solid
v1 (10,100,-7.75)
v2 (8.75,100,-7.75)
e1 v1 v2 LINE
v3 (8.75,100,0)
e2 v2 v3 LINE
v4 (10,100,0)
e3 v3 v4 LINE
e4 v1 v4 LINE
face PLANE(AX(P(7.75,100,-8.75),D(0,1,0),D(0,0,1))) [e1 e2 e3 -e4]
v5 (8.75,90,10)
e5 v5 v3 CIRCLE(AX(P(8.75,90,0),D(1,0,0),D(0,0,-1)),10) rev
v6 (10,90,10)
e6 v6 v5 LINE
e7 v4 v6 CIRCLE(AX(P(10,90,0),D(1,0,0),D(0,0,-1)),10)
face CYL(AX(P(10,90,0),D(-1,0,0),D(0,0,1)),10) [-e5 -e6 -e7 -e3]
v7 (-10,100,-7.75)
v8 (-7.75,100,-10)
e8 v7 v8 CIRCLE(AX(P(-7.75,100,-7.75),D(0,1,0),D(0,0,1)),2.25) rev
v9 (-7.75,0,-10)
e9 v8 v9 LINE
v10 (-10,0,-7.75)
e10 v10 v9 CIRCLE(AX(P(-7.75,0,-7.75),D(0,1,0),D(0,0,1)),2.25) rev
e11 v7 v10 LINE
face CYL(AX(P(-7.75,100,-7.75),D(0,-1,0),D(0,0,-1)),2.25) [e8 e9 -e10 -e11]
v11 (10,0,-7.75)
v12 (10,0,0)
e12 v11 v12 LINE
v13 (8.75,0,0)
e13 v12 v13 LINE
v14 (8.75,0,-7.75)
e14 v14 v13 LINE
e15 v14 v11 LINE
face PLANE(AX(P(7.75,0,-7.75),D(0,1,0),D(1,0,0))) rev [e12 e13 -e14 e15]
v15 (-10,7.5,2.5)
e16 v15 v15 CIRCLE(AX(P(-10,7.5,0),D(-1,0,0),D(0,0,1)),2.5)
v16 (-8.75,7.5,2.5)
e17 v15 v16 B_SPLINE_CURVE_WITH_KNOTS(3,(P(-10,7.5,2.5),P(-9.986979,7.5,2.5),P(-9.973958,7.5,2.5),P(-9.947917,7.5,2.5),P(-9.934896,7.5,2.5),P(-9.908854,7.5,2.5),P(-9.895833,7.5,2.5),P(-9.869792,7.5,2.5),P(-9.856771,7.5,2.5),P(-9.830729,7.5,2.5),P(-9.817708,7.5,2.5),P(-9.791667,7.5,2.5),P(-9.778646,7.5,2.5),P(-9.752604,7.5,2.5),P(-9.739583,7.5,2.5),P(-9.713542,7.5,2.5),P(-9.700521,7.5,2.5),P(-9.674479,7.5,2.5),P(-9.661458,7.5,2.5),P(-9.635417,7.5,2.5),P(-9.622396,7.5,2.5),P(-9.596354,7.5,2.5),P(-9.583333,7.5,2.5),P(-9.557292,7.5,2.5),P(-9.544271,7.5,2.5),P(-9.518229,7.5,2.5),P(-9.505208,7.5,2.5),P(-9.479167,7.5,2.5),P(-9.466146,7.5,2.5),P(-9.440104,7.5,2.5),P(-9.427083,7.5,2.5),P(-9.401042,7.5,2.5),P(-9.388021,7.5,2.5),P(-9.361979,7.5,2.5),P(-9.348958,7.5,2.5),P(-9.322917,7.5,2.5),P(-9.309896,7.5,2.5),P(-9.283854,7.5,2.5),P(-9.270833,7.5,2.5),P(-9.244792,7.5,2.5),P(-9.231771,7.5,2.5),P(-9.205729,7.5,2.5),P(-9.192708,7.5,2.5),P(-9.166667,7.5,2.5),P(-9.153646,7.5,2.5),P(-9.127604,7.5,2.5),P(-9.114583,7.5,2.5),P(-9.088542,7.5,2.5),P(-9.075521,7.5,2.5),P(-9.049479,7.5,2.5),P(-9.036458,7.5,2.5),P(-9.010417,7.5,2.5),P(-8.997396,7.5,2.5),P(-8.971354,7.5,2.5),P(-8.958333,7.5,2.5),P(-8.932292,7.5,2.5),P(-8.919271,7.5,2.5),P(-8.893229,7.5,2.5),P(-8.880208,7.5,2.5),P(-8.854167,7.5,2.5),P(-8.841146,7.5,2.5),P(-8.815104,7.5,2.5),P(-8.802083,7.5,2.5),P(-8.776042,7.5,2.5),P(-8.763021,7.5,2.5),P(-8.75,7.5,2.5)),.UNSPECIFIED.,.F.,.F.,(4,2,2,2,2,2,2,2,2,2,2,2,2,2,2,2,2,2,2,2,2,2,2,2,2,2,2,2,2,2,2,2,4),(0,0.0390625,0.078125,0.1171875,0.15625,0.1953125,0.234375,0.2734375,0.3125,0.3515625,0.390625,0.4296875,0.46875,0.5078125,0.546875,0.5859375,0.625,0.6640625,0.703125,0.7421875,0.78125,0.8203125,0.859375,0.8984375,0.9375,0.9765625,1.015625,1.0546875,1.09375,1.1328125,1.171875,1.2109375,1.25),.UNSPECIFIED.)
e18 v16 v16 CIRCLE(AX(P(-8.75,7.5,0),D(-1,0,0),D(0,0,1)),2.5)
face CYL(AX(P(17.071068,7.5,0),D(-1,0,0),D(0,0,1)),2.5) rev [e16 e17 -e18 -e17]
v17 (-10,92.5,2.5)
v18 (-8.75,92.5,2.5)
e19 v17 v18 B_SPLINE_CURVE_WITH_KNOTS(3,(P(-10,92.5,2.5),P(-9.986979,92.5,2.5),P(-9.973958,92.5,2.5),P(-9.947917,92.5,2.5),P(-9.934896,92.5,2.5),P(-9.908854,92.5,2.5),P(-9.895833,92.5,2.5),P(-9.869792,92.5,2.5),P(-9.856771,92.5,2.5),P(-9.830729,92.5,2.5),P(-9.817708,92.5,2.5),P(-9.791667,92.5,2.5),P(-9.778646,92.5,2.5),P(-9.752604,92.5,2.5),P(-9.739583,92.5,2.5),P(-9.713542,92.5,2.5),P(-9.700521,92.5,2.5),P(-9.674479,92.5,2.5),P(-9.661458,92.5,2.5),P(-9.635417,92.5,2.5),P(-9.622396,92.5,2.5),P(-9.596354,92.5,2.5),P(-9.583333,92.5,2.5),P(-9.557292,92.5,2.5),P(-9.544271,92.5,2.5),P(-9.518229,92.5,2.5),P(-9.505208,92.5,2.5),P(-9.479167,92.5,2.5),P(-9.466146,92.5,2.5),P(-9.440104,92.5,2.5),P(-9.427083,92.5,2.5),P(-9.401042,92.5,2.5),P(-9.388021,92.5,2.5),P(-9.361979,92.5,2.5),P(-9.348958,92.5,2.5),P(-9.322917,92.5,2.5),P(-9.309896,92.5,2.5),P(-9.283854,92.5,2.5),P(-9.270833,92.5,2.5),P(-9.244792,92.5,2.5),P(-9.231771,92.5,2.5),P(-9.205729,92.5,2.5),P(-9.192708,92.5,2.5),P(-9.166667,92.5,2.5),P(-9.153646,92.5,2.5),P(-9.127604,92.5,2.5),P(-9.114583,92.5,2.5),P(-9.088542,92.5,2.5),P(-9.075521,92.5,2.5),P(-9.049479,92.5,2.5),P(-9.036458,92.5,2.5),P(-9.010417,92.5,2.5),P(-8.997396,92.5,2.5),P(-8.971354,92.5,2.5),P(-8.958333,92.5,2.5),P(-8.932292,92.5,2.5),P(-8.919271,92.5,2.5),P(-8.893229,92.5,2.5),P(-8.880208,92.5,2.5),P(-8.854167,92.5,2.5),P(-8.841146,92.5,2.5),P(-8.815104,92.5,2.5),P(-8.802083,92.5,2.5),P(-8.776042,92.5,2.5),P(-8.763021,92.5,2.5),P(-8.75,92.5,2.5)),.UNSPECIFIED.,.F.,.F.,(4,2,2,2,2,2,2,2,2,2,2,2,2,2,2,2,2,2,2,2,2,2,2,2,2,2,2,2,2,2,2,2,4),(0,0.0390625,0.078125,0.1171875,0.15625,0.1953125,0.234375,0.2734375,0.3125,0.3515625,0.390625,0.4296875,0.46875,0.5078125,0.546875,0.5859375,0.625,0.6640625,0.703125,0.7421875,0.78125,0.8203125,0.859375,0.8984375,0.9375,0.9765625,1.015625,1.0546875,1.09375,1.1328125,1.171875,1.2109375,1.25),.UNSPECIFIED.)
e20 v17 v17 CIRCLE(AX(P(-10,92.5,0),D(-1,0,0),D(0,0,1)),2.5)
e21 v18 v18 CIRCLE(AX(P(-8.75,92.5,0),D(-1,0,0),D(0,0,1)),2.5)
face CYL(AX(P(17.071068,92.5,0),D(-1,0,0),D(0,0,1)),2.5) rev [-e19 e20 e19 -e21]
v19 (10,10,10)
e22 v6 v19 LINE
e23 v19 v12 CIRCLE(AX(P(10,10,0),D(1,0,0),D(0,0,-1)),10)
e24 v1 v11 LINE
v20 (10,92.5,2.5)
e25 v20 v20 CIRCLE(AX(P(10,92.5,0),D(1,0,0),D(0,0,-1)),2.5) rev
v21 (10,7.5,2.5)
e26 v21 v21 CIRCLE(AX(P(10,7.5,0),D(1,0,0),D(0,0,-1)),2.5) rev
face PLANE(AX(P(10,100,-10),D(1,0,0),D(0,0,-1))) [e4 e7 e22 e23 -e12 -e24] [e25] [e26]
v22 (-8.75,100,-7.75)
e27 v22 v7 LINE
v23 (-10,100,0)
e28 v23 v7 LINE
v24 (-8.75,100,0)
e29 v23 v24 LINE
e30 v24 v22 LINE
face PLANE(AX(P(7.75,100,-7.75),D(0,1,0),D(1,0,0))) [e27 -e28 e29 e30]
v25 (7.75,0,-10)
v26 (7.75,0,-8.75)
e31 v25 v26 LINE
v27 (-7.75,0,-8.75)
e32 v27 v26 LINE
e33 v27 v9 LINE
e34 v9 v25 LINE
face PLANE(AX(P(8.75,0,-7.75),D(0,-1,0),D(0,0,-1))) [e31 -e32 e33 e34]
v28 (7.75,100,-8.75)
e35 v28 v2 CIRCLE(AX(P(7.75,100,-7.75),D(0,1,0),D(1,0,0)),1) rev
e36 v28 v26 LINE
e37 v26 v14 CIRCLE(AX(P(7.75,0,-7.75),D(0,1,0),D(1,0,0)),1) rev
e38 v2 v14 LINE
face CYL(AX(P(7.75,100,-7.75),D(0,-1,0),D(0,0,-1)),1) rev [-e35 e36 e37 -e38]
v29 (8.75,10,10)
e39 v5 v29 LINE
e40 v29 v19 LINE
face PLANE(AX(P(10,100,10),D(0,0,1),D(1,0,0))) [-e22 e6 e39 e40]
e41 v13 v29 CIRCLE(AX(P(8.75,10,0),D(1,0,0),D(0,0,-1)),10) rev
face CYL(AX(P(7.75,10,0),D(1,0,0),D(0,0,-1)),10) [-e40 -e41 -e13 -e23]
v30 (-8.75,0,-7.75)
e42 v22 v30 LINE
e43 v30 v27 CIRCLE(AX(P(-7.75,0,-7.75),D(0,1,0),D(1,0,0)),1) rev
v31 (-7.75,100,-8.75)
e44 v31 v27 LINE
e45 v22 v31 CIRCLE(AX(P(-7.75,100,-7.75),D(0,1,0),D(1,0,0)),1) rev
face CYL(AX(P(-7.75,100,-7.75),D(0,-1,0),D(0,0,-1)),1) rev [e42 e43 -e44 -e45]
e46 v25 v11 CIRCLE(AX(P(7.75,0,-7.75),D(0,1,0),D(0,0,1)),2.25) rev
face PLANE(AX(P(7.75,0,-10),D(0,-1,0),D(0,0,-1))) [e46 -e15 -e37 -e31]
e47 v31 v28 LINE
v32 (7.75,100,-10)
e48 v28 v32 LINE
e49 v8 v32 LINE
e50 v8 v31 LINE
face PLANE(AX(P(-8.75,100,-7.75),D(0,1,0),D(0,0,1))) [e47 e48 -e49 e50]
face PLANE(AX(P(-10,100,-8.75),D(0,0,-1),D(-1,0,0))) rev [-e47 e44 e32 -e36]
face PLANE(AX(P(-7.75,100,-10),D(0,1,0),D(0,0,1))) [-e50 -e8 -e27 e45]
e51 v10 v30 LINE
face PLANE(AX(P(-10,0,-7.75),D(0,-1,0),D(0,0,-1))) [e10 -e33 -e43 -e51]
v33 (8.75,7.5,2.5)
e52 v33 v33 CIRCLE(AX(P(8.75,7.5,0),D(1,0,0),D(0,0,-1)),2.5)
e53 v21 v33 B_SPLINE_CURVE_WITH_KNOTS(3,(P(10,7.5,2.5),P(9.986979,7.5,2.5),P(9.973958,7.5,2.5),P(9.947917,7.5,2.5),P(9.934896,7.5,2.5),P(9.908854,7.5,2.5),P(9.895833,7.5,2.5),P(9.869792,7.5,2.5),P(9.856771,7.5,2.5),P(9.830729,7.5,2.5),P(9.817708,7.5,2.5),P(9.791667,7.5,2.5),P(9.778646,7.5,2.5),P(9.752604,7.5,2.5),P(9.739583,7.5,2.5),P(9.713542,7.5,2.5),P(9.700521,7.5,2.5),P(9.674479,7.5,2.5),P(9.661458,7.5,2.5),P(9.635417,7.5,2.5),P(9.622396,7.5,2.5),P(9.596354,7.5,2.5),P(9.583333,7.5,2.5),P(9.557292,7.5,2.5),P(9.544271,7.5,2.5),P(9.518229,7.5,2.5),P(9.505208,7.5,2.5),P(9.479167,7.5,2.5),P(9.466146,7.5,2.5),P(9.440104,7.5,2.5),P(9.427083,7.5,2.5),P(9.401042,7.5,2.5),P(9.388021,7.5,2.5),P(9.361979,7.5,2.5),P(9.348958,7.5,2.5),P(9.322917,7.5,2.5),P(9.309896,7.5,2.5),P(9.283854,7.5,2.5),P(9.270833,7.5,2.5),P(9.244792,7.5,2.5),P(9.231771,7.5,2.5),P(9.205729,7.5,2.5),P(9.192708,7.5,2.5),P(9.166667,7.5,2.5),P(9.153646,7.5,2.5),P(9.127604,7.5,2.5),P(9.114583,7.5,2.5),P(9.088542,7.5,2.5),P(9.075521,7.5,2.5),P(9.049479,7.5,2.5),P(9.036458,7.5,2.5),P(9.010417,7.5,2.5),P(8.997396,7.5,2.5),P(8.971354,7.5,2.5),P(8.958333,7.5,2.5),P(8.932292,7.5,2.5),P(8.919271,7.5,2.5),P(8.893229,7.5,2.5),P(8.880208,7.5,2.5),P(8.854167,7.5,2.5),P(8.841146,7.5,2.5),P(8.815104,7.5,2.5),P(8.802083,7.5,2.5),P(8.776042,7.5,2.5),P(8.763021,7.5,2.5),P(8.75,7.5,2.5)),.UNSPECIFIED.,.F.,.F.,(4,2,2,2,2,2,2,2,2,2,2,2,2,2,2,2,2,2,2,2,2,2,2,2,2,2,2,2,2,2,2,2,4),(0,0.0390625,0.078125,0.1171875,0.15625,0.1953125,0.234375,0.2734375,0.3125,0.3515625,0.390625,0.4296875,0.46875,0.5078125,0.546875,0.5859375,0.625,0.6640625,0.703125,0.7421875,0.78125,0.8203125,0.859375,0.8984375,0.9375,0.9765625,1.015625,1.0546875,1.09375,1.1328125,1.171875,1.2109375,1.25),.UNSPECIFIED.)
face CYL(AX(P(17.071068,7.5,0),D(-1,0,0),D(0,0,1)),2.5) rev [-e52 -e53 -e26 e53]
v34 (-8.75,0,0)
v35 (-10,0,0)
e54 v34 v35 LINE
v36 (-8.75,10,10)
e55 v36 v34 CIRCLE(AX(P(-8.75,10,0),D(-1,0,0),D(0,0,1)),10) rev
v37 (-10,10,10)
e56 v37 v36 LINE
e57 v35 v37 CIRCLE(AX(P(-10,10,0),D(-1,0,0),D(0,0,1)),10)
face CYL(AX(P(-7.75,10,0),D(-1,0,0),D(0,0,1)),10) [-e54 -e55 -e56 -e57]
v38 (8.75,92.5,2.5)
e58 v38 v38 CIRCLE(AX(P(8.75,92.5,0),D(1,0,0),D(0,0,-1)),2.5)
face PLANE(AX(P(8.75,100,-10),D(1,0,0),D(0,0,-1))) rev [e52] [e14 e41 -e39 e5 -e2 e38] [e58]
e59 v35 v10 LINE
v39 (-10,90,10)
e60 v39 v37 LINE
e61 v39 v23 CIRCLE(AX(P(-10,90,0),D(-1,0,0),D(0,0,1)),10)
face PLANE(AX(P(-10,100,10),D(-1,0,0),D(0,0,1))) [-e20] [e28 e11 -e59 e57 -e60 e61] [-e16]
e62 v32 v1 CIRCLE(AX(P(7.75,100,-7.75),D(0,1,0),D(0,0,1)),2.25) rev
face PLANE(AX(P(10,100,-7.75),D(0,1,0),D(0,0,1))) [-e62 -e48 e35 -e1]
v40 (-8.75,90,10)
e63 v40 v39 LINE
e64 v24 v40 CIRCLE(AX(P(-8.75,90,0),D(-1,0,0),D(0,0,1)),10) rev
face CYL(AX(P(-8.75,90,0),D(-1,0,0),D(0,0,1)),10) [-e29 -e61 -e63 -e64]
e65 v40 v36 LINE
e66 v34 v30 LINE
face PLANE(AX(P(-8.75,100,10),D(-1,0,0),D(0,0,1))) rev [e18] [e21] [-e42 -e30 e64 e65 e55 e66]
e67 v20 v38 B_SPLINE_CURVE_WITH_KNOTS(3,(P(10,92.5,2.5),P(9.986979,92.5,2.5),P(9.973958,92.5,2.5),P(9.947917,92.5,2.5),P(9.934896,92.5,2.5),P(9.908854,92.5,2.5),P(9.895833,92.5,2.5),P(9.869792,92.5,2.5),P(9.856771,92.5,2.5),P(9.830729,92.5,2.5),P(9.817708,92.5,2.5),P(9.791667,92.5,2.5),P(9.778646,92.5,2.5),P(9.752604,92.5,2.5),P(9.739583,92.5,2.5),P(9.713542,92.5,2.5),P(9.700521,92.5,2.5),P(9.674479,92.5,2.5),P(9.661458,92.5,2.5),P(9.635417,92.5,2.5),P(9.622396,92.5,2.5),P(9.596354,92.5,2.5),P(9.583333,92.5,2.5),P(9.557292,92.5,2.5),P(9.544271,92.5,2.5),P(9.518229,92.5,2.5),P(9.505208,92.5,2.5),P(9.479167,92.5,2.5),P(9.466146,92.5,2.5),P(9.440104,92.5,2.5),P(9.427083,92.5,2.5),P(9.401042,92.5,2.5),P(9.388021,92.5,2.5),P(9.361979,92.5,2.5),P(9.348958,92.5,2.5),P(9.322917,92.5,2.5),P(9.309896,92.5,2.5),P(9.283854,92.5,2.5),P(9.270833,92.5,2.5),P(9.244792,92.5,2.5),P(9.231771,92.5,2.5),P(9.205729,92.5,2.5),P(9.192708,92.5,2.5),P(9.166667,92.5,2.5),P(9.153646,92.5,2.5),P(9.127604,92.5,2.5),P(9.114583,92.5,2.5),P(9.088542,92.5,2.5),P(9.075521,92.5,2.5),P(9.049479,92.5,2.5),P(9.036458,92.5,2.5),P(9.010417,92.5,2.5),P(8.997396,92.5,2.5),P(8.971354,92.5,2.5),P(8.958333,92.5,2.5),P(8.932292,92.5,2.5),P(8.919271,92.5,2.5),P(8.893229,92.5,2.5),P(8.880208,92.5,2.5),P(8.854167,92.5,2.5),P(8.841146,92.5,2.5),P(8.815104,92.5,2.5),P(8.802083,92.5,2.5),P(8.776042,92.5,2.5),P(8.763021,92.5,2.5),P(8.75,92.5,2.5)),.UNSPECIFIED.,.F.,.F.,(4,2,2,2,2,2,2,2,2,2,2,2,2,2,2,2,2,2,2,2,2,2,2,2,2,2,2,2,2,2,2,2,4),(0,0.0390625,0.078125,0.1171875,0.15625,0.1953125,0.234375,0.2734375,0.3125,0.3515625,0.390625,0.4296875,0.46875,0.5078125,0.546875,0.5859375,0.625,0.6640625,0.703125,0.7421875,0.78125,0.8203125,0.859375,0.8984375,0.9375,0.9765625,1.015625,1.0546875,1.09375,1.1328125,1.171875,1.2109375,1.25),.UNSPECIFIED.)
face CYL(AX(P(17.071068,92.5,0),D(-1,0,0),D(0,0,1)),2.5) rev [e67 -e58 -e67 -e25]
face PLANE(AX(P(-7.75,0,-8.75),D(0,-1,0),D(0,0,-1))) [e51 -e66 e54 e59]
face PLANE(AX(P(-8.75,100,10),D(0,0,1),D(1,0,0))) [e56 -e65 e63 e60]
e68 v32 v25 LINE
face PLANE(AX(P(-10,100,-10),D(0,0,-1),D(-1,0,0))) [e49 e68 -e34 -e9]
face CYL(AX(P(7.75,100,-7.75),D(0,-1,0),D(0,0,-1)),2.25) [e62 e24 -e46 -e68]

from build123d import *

# Parameters (mm, degrees)
BASE_FLANGE1_DEPTH = 100
CUT_EXTRUDE1_REACH = 104.47
SKETCH3_R          = 2.5
FILLET1_R          = 10


# Sheet-metal steps are written as plain solids
with BuildPart() as part:
    # Sketch2 → Base-Flange1 (new body)
    with BuildSketch(Plane(origin=(0, 0, 0), x_dir=(1, 0, 0), z_dir=(0, 1, 0))):
        with BuildLine():
            Line((-10, -10), (-10, 7.75))
            ThreePointArc((-10, 7.75), (-9.340990258, 9.340990258), (-7.75, 10))
            Line((-7.75, 10), (7.75, 10))
            ThreePointArc((7.75, 10), (9.340990258, 9.340990258), (10, 7.75))
            Line((10, 7.75), (10, -10))
            Line((10, -10), (8.75, -10))
            Line((8.75, -10), (8.75, 7.75))
            ThreePointArc((8.75, 7.75), (8.457106781, 8.457106781), (7.75, 8.75))
            Line((7.75, 8.75), (-7.75, 8.75))
            ThreePointArc((-7.75, 8.75), (-8.457106781, 8.457106781), (-8.75, 7.75))
            Line((-8.75, 7.75), (-8.75, -10))
            Line((-8.75, -10), (-10, -10))
        make_face()
    extrude(amount=BASE_FLANGE1_DEPTH)

    # Cut-Extrude1: up to this face of the body (flat: up to its plane)
    cut_extrude1_end = Plane(part.part.faces().sort_by_distance((10, 50, 1.125))[0])
    # Sketch3 → Cut-Extrude1 (cut, up to the picked face)
    with BuildSketch(Plane.ZY.offset(10), mode=Mode.PRIVATE) as cut_extrude1_sk1:
        with Locations((0, 7.5)):
            Circle(SKETCH3_R)
    cut_extrude1_tool1 = split(extrude(cut_extrude1_sk1.sketch, amount=-CUT_EXTRUDE1_REACH, mode=Mode.PRIVATE), bisect_by=cut_extrude1_end, keep=Keep.BOTH, mode=Mode.PRIVATE)
    # Sketch3 → Cut-Extrude1 (cut, up to the picked face)
    with BuildSketch(Plane.ZY.offset(10), mode=Mode.PRIVATE) as cut_extrude1_sk2:
        with Locations((0, 92.5)):
            Circle(SKETCH3_R)
    cut_extrude1_tool2 = split(extrude(cut_extrude1_sk2.sketch, amount=-CUT_EXTRUDE1_REACH, mode=Mode.PRIVATE), bisect_by=cut_extrude1_end, keep=Keep.BOTH, mode=Mode.PRIVATE)
    add(cut_extrude1_tool1.solids().sort_by(Axis((-10, 7.5, 0), (1, 0, 0)))[0], mode=Mode.SUBTRACT)
    add(cut_extrude1_tool2.solids().sort_by(Axis((-10, 92.5, 0), (1, 0, 0)))[0], mode=Mode.SUBTRACT)

    # Fillet1
    fillet1_edges = [part.edges().sort_by_distance(p)[0] for p in [
        (-9.375, 0, 10),
        (9.375, 0, 10),
        (-9.375, 100, 10),
        (9.375, 100, 10),
    ]]
    fillet(fillet1_edges, radius=FILLET1_R)


solid = part.part
